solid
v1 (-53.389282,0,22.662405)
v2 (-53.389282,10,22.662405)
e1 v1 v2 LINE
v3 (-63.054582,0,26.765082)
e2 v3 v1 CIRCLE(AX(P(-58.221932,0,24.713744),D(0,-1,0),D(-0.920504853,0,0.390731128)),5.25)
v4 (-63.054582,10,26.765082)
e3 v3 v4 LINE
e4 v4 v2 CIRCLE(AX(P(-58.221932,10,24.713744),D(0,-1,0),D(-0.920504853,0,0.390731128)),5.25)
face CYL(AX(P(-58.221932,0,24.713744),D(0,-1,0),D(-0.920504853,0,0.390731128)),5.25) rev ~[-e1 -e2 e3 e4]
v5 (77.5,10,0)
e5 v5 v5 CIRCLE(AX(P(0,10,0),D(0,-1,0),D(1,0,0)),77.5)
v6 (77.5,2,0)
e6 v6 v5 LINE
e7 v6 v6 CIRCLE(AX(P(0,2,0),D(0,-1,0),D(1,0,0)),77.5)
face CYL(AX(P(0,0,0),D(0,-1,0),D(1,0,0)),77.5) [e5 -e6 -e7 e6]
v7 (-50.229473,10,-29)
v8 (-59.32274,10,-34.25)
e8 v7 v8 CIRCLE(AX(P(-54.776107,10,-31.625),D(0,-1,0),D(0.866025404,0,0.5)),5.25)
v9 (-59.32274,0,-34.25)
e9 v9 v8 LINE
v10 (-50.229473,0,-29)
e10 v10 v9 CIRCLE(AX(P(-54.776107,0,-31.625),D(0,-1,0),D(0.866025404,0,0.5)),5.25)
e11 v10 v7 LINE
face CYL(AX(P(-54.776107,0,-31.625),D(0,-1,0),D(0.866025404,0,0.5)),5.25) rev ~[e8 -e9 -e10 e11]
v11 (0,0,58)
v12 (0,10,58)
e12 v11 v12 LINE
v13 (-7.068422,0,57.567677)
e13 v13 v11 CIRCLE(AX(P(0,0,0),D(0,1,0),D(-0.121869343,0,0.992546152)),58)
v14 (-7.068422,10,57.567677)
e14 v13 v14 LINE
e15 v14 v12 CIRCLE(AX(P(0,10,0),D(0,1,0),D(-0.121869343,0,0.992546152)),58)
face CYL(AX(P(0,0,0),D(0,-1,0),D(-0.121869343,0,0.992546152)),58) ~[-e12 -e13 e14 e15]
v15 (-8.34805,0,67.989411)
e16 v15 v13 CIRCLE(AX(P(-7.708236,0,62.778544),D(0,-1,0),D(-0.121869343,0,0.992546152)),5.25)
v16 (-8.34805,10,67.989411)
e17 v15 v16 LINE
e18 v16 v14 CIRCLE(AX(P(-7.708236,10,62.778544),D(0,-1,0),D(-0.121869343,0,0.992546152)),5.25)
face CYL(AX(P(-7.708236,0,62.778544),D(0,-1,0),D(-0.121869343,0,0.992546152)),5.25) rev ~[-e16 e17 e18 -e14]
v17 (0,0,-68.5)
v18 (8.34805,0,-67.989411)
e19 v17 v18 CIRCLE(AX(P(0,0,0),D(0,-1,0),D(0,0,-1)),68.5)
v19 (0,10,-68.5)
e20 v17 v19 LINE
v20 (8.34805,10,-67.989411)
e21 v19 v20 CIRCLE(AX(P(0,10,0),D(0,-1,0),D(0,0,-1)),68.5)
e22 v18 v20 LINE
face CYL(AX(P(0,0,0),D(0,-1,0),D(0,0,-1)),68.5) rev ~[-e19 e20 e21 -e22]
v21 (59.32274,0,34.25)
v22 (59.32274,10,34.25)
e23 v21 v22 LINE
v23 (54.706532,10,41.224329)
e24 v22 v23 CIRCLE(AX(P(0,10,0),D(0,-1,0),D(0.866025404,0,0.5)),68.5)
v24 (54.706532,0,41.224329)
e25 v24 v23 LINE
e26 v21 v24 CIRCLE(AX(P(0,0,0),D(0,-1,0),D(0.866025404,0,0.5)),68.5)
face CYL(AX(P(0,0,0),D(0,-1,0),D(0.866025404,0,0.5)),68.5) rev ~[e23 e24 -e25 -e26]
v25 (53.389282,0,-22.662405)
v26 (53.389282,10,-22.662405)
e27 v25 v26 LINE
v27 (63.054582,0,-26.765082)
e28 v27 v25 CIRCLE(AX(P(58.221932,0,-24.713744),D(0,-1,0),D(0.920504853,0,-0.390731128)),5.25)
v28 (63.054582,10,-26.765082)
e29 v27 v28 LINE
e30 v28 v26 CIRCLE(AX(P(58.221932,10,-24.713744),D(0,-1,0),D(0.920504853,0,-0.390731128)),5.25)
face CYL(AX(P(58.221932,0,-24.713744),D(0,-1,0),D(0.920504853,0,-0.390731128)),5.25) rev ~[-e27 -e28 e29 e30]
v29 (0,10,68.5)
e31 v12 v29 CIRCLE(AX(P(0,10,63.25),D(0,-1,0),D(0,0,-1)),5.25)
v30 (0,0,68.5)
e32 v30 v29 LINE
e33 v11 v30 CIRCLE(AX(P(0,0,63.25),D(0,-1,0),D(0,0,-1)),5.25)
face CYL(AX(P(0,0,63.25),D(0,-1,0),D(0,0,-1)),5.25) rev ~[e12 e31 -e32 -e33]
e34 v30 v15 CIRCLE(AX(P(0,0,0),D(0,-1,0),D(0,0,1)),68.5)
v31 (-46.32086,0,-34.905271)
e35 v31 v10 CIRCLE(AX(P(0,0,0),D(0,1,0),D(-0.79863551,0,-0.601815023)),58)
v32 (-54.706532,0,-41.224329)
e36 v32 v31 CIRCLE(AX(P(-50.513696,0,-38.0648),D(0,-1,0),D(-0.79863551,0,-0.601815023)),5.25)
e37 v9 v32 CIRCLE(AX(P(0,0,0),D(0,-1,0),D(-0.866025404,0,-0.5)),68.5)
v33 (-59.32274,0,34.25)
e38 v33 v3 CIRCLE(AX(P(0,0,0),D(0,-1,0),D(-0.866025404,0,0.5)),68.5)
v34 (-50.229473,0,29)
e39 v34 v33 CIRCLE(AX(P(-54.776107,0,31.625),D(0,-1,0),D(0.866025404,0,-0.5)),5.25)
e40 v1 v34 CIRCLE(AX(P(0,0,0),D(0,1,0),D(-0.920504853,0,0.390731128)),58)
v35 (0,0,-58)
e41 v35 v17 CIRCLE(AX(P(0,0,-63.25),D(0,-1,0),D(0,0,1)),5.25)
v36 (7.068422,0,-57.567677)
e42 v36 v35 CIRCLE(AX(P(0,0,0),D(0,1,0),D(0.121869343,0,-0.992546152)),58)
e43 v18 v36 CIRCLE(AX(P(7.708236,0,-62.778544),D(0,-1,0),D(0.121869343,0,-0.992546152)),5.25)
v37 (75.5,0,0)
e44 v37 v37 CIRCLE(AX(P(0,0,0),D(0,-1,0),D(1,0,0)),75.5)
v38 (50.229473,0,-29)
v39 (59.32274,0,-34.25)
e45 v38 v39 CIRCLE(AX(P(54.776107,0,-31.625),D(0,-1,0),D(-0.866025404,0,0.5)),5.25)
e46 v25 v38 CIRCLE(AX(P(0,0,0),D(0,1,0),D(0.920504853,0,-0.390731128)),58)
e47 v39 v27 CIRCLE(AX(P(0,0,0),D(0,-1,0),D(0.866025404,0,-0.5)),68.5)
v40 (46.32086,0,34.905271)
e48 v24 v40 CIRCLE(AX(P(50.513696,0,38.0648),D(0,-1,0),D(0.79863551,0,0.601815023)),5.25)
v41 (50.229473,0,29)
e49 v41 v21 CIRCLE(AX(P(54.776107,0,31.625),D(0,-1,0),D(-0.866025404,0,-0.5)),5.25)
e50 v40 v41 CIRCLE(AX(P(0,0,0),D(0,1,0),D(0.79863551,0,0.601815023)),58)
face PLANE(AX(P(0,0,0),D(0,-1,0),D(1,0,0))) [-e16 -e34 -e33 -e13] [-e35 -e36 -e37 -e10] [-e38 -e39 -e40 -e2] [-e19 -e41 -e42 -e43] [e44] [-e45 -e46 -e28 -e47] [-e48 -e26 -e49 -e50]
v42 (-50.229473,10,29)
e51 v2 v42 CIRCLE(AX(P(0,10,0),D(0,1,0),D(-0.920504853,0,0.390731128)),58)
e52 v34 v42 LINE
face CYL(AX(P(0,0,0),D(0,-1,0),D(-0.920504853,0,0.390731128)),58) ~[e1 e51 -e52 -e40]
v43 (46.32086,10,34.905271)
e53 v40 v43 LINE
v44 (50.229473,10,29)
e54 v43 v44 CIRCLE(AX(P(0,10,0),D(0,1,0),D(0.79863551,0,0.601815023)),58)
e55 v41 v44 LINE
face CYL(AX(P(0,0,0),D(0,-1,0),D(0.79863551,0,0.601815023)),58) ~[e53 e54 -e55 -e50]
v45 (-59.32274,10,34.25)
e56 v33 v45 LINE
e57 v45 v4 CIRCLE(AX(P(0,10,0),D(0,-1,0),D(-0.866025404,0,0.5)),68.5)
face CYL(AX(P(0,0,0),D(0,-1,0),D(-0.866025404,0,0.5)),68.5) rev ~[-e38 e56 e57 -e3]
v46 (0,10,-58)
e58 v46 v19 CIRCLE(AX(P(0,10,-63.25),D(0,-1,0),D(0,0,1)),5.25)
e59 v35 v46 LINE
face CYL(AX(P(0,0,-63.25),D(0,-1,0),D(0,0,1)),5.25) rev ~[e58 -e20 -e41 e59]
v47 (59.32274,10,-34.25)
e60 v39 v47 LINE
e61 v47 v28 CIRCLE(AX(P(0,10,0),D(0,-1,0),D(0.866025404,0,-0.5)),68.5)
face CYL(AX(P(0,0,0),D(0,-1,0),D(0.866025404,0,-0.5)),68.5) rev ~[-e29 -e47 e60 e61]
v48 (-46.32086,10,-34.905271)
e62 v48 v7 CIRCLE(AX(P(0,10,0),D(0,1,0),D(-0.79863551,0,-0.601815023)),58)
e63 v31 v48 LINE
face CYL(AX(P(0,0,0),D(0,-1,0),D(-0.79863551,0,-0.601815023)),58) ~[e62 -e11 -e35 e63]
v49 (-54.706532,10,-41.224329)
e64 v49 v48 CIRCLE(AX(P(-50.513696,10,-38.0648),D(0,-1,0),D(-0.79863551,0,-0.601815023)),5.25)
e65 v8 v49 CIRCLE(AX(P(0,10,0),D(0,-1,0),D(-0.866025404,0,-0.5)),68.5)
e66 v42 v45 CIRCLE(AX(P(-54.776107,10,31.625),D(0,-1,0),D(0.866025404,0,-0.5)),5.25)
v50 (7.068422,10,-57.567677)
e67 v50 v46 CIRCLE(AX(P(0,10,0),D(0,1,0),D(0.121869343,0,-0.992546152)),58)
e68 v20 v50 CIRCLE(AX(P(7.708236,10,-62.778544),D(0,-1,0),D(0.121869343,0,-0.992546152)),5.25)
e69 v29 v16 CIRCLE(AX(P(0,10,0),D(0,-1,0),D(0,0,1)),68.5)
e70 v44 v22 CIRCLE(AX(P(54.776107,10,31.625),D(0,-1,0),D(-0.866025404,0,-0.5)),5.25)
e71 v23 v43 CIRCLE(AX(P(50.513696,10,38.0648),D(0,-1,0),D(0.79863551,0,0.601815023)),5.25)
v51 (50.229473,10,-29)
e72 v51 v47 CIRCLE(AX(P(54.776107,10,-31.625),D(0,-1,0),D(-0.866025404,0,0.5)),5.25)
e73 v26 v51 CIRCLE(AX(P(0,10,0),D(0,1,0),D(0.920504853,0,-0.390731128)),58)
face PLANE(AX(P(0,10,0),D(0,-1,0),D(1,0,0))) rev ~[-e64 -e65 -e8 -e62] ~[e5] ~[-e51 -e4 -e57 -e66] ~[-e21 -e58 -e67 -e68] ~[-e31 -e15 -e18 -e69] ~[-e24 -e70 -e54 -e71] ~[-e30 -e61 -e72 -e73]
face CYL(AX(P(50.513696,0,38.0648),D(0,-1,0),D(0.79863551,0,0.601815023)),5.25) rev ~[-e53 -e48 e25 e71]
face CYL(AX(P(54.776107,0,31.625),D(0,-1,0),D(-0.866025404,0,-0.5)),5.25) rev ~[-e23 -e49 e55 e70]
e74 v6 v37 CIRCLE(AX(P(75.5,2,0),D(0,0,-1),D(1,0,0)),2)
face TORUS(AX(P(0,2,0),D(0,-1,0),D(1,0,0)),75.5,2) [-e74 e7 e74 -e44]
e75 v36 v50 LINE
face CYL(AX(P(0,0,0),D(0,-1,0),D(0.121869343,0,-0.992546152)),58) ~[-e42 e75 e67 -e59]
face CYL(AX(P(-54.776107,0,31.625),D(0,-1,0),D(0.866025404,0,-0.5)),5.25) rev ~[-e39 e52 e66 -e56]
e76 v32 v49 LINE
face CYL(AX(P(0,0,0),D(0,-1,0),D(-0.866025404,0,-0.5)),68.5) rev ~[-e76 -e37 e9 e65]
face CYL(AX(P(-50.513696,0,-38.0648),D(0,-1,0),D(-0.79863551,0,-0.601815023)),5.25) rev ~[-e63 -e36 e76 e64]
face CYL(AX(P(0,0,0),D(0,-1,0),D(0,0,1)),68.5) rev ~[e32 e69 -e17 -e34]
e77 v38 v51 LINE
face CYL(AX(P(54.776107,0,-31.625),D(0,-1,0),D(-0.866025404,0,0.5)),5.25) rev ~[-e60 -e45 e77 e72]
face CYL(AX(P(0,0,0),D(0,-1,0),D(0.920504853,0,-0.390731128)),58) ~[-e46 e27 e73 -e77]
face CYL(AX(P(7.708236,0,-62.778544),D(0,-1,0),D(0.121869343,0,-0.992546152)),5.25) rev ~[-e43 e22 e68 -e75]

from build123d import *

# Parameters (mm, degrees)
F1_R            = 77.5
F2_DEPTH        = 10
F3_R            = 2
F4_DEPTH        = 10
F4_COPIES_COUNT = 6


# Not quite as in the source:
# - a pattern or mirror of a feature is missing from the dataset's text; its kind, count and spacing are read off the source's solid


with BuildPart() as f2:
    # F1 (on Front) → F2 (new body)
    with BuildSketch(Plane.XZ):
        Circle(F1_R)
    extrude(amount=-F2_DEPTH)

    # F3
    f3_edges = [f2.edges().sort_by_distance(p)[0] for p in [
        (-77.5, 0, 0),
    ]]
    fillet(f3_edges, radius=F3_R)

    # F0 (on Front) → F4 (cut, through all)
    with BuildSketch(Plane.XZ):
        with BuildLine():
            ThreePointArc((0, 68.5), (-4.1818249581, 68.3722336919), (-8.3480500233, 67.9894113874))
            ThreePointArc((-8.3480500233, 67.9894113874), (-12.9191032665, 62.1387300384), (-7.0684219175, 57.5676767952))
            ThreePointArc((-7.0684219175, 57.5676767952), (-3.540815293, 57.8918183085), (0, 58))
            ThreePointArc((0, 58), (5.25, 63.25), (0, 68.5))
        make_face()
    f4 = extrude(amount=-F4_DEPTH, mode=Mode.SUBTRACT)

    # F4_copies: F4 ×6 about axis
    f4_copies_axis = Axis((0, 0, 0), (0, 1, 0))
    for i in range(1, F4_COPIES_COUNT):
        add(f4.rotate(f4_copies_axis, i * 360 / F4_COPIES_COUNT), mode=Mode.SUBTRACT)


solid = f2.part
